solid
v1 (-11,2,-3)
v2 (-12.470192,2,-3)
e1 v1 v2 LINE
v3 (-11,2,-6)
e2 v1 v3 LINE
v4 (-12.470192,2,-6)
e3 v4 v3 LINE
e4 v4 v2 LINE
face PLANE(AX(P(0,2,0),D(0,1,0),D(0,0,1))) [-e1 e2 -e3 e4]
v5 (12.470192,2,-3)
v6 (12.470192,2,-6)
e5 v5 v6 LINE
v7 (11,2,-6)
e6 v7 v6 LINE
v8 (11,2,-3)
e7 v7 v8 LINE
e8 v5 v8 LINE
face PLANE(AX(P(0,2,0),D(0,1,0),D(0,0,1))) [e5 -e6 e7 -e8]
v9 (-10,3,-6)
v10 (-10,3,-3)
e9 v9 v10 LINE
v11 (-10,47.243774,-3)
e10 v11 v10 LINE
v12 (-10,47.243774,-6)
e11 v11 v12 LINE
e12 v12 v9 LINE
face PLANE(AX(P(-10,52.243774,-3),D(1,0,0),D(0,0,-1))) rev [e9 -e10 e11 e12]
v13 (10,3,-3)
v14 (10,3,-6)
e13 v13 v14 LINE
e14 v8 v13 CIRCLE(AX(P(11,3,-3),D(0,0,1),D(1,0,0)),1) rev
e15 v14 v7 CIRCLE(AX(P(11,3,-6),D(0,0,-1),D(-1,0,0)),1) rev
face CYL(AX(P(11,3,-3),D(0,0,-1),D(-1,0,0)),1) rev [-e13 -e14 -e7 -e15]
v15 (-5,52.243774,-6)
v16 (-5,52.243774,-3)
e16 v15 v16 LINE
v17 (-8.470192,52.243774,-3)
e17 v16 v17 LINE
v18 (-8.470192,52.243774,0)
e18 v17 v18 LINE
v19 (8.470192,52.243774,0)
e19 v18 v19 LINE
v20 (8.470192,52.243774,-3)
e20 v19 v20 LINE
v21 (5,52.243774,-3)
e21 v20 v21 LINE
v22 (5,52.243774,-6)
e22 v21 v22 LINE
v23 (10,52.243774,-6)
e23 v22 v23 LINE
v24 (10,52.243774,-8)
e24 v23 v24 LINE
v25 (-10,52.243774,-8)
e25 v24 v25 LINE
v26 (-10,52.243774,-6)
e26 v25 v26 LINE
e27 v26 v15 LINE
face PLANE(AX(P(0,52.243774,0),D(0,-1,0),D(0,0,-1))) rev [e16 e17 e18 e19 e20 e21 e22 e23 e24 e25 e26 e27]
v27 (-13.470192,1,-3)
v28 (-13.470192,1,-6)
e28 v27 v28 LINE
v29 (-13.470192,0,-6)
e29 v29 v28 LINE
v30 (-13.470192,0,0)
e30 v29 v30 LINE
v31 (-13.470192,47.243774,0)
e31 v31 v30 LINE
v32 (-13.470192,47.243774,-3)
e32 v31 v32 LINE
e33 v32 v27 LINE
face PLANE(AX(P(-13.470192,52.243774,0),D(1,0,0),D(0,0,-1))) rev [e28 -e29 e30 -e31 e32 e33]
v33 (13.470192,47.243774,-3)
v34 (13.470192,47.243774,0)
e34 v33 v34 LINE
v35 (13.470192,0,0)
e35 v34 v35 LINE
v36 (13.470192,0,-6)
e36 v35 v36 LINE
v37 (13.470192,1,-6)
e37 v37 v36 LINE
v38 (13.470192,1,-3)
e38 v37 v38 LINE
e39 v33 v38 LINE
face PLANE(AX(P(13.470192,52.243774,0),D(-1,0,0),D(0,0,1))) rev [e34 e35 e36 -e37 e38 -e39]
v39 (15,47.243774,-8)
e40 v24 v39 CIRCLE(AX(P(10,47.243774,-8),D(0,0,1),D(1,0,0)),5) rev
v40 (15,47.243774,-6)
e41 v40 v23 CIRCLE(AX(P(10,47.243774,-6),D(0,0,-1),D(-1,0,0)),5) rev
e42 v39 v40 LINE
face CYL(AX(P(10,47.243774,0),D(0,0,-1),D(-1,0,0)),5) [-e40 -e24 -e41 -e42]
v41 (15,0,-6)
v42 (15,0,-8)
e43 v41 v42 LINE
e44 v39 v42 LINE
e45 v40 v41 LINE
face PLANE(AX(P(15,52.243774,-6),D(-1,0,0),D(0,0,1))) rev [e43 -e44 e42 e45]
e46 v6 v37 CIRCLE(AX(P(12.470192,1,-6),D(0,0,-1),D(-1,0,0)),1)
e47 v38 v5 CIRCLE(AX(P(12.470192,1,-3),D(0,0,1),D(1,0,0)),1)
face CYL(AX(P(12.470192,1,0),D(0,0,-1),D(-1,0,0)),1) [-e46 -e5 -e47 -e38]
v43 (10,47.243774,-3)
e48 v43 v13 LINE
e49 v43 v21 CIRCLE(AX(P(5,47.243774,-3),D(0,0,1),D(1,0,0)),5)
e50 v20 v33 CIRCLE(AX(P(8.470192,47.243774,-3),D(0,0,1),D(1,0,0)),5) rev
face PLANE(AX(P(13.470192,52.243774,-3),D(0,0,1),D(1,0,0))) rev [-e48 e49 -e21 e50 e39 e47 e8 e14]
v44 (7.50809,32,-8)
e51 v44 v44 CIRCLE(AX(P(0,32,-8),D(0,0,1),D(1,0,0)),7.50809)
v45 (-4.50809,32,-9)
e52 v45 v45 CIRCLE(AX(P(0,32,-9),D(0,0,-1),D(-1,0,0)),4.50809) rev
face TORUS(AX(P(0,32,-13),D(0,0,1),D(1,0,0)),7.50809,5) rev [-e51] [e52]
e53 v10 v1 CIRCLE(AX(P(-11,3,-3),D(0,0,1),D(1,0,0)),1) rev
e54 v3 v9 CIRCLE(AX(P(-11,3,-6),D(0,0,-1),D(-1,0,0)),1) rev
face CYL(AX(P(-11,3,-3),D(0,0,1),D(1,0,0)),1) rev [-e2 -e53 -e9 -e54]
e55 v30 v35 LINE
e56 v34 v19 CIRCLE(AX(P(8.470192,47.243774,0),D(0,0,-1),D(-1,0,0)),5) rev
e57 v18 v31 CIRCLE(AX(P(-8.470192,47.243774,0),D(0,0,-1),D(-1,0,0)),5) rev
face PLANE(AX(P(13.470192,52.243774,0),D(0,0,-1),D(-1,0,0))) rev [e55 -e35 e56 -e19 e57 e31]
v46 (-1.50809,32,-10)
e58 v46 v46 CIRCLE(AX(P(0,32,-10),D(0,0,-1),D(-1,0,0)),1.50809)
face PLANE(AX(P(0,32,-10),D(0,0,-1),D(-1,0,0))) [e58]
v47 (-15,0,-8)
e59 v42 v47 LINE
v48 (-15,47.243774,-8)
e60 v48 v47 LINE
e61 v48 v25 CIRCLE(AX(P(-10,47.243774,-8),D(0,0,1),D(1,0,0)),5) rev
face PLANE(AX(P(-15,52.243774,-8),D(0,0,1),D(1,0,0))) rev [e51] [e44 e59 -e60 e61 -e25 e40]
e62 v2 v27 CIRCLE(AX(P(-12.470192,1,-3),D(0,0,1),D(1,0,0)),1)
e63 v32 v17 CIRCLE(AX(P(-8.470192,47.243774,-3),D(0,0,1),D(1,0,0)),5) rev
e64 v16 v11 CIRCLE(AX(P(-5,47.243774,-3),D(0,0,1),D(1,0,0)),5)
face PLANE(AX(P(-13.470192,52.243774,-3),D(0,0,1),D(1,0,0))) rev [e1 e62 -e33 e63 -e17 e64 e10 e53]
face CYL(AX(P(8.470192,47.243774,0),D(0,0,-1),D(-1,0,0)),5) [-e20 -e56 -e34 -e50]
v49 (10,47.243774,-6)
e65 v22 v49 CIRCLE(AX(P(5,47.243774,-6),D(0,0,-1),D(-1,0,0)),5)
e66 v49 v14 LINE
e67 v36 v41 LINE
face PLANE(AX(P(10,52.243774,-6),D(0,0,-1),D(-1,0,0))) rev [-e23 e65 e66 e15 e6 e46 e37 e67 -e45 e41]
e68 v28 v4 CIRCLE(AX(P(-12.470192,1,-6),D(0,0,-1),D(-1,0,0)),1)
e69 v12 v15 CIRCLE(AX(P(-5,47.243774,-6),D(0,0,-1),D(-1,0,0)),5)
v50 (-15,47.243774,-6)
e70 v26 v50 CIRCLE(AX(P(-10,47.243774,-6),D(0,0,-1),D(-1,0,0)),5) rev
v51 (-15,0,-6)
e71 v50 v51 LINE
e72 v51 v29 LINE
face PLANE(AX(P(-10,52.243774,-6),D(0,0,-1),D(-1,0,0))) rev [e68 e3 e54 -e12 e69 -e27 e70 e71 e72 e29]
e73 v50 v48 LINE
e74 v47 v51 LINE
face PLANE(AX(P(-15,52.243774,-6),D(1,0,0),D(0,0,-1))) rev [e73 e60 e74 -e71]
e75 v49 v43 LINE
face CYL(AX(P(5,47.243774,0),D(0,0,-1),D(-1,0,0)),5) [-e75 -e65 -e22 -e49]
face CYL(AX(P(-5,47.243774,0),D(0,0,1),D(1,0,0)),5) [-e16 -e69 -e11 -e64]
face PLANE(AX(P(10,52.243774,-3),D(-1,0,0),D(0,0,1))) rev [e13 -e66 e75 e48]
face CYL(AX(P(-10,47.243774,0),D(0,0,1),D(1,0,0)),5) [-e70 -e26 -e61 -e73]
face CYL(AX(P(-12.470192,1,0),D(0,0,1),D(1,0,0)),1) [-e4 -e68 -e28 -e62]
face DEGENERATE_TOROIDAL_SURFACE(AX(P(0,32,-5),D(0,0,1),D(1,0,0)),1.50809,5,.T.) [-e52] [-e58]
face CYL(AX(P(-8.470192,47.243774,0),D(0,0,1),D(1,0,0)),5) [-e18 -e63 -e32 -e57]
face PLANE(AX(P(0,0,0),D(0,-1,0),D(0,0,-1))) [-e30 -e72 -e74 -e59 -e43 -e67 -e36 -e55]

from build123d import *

# Parameters (mm, degrees)
BOSS_EXTRUDE1_DEPTH = 52.243773639
SKETCH2_W           = 26.940383964
SKETCH2_H           = 5.525205864
BOSS_EXTRUDE2_DEPTH = 2
FILLET1_R           = 5
FILLET3_R           = 1
FILLET4_R           = 5
SKETCH3_R           = 3.508090029
BOSS_EXTRUDE3_DEPTH = 2
FILLET5_R           = 5
FILLET6_R           = 5


# Some blends are built 0.0001 mm under size
with BuildPart() as part:
    # Sketch1 → Boss-Extrude1 (new body)
    with BuildSketch(Plane(origin=(0, 0, 0), x_dir=(1, 0, 0), z_dir=(0, 1, 0))):
        Polygon((13.470191982, 0), (-13.470191982, 0), (-13.470191982, 3), (-10, 3), (-10, 6), (-15, 6), (-15, 8), (15, 8), (15, 6), (10, 6), (10, 3), (13.470191982, 3), align=None)
    extrude(amount=BOSS_EXTRUDE1_DEPTH)

    # Sketch2 → Boss-Extrude2 (add)
    with BuildSketch(Plane.XZ):
        with Locations((0, -4.262602932)):
            Rectangle(SKETCH2_W, SKETCH2_H)
    extrude(amount=-BOSS_EXTRUDE2_DEPTH)

    # Fillet1
    fillet1_edges = [part.edges().sort_by_distance(p)[0] for p in [
        (10, 52.243773639, -4.5),
        (-10, 52.243773639, -4.5),
        (-15, 52.243773639, -7),
        (15, 52.243773639, -7),
    ]]
    fillet(fillet1_edges, radius=FILLET1_R - 0.0001)  # a hair under: the kernel refuses the full size

    # Fillet3
    fillet3_edges = [part.edges().sort_by_distance(p)[0] for p in [
        (13.470191982, 2, -4.5),
        (-13.470191982, 2, -4.5),
        (10, 2, -4.5),
        (-10, 2, -4.5),
    ]]
    fillet(fillet3_edges, radius=FILLET3_R)

    # Fillet4
    fillet4_edges = [part.edges().sort_by_distance(p)[0] for p in [
        (13.470191982, 52.243773639, -1.5),
        (-13.470191982, 52.243773639, -1.5),
    ]]
    fillet(fillet4_edges, radius=FILLET4_R)

    # Sketch3 → Boss-Extrude3 (add)
    with BuildSketch(Plane(origin=(0, 0, -8), x_dir=(-1, 0, 0), z_dir=(0, 0, -1))):
        with Locations(Location((0, 32, 0), (0, 0, 180))):
            Circle(SKETCH3_R)
    extrude(amount=BOSS_EXTRUDE3_DEPTH)

    # Fillet5
    # the kernel refuses this fillet: 5 mm, written as the material it adds along each edge
    with BuildSketch(Plane(origin=(0, 32, -8), x_dir=(1, 0, 0), z_dir=(0, 1, 0))) as fillet5_piece_1:
        with BuildLine():
            CenterArc((7.508090029, 5), FILLET5_R, 216.869897646, 53.130102354)
            Line((3.508090029, 2), (3.428090029, 1.94))
            ThreePointArc((3.428090029, 1.94), (3.408090029, 1), (3.408090029, 0))
            Line((3.408090029, 0), (3.508090029, -0.1))
            Line((3.508090029, -0.1), (7.508090029, -0.1))
            Line((7.508090029, -0.1), (7.508090029, 0))
        make_face()
    revolve(axis=Axis((0, 32, -8), (0, 0, -1)))

    # Fillet6
    fillet6_edges = [part.edges().sort_by_distance(p)[0] for p in [
        (-3.508090029, 32, -10),
    ]]
    fillet(fillet6_edges, radius=FILLET6_R)


solid = part.part
